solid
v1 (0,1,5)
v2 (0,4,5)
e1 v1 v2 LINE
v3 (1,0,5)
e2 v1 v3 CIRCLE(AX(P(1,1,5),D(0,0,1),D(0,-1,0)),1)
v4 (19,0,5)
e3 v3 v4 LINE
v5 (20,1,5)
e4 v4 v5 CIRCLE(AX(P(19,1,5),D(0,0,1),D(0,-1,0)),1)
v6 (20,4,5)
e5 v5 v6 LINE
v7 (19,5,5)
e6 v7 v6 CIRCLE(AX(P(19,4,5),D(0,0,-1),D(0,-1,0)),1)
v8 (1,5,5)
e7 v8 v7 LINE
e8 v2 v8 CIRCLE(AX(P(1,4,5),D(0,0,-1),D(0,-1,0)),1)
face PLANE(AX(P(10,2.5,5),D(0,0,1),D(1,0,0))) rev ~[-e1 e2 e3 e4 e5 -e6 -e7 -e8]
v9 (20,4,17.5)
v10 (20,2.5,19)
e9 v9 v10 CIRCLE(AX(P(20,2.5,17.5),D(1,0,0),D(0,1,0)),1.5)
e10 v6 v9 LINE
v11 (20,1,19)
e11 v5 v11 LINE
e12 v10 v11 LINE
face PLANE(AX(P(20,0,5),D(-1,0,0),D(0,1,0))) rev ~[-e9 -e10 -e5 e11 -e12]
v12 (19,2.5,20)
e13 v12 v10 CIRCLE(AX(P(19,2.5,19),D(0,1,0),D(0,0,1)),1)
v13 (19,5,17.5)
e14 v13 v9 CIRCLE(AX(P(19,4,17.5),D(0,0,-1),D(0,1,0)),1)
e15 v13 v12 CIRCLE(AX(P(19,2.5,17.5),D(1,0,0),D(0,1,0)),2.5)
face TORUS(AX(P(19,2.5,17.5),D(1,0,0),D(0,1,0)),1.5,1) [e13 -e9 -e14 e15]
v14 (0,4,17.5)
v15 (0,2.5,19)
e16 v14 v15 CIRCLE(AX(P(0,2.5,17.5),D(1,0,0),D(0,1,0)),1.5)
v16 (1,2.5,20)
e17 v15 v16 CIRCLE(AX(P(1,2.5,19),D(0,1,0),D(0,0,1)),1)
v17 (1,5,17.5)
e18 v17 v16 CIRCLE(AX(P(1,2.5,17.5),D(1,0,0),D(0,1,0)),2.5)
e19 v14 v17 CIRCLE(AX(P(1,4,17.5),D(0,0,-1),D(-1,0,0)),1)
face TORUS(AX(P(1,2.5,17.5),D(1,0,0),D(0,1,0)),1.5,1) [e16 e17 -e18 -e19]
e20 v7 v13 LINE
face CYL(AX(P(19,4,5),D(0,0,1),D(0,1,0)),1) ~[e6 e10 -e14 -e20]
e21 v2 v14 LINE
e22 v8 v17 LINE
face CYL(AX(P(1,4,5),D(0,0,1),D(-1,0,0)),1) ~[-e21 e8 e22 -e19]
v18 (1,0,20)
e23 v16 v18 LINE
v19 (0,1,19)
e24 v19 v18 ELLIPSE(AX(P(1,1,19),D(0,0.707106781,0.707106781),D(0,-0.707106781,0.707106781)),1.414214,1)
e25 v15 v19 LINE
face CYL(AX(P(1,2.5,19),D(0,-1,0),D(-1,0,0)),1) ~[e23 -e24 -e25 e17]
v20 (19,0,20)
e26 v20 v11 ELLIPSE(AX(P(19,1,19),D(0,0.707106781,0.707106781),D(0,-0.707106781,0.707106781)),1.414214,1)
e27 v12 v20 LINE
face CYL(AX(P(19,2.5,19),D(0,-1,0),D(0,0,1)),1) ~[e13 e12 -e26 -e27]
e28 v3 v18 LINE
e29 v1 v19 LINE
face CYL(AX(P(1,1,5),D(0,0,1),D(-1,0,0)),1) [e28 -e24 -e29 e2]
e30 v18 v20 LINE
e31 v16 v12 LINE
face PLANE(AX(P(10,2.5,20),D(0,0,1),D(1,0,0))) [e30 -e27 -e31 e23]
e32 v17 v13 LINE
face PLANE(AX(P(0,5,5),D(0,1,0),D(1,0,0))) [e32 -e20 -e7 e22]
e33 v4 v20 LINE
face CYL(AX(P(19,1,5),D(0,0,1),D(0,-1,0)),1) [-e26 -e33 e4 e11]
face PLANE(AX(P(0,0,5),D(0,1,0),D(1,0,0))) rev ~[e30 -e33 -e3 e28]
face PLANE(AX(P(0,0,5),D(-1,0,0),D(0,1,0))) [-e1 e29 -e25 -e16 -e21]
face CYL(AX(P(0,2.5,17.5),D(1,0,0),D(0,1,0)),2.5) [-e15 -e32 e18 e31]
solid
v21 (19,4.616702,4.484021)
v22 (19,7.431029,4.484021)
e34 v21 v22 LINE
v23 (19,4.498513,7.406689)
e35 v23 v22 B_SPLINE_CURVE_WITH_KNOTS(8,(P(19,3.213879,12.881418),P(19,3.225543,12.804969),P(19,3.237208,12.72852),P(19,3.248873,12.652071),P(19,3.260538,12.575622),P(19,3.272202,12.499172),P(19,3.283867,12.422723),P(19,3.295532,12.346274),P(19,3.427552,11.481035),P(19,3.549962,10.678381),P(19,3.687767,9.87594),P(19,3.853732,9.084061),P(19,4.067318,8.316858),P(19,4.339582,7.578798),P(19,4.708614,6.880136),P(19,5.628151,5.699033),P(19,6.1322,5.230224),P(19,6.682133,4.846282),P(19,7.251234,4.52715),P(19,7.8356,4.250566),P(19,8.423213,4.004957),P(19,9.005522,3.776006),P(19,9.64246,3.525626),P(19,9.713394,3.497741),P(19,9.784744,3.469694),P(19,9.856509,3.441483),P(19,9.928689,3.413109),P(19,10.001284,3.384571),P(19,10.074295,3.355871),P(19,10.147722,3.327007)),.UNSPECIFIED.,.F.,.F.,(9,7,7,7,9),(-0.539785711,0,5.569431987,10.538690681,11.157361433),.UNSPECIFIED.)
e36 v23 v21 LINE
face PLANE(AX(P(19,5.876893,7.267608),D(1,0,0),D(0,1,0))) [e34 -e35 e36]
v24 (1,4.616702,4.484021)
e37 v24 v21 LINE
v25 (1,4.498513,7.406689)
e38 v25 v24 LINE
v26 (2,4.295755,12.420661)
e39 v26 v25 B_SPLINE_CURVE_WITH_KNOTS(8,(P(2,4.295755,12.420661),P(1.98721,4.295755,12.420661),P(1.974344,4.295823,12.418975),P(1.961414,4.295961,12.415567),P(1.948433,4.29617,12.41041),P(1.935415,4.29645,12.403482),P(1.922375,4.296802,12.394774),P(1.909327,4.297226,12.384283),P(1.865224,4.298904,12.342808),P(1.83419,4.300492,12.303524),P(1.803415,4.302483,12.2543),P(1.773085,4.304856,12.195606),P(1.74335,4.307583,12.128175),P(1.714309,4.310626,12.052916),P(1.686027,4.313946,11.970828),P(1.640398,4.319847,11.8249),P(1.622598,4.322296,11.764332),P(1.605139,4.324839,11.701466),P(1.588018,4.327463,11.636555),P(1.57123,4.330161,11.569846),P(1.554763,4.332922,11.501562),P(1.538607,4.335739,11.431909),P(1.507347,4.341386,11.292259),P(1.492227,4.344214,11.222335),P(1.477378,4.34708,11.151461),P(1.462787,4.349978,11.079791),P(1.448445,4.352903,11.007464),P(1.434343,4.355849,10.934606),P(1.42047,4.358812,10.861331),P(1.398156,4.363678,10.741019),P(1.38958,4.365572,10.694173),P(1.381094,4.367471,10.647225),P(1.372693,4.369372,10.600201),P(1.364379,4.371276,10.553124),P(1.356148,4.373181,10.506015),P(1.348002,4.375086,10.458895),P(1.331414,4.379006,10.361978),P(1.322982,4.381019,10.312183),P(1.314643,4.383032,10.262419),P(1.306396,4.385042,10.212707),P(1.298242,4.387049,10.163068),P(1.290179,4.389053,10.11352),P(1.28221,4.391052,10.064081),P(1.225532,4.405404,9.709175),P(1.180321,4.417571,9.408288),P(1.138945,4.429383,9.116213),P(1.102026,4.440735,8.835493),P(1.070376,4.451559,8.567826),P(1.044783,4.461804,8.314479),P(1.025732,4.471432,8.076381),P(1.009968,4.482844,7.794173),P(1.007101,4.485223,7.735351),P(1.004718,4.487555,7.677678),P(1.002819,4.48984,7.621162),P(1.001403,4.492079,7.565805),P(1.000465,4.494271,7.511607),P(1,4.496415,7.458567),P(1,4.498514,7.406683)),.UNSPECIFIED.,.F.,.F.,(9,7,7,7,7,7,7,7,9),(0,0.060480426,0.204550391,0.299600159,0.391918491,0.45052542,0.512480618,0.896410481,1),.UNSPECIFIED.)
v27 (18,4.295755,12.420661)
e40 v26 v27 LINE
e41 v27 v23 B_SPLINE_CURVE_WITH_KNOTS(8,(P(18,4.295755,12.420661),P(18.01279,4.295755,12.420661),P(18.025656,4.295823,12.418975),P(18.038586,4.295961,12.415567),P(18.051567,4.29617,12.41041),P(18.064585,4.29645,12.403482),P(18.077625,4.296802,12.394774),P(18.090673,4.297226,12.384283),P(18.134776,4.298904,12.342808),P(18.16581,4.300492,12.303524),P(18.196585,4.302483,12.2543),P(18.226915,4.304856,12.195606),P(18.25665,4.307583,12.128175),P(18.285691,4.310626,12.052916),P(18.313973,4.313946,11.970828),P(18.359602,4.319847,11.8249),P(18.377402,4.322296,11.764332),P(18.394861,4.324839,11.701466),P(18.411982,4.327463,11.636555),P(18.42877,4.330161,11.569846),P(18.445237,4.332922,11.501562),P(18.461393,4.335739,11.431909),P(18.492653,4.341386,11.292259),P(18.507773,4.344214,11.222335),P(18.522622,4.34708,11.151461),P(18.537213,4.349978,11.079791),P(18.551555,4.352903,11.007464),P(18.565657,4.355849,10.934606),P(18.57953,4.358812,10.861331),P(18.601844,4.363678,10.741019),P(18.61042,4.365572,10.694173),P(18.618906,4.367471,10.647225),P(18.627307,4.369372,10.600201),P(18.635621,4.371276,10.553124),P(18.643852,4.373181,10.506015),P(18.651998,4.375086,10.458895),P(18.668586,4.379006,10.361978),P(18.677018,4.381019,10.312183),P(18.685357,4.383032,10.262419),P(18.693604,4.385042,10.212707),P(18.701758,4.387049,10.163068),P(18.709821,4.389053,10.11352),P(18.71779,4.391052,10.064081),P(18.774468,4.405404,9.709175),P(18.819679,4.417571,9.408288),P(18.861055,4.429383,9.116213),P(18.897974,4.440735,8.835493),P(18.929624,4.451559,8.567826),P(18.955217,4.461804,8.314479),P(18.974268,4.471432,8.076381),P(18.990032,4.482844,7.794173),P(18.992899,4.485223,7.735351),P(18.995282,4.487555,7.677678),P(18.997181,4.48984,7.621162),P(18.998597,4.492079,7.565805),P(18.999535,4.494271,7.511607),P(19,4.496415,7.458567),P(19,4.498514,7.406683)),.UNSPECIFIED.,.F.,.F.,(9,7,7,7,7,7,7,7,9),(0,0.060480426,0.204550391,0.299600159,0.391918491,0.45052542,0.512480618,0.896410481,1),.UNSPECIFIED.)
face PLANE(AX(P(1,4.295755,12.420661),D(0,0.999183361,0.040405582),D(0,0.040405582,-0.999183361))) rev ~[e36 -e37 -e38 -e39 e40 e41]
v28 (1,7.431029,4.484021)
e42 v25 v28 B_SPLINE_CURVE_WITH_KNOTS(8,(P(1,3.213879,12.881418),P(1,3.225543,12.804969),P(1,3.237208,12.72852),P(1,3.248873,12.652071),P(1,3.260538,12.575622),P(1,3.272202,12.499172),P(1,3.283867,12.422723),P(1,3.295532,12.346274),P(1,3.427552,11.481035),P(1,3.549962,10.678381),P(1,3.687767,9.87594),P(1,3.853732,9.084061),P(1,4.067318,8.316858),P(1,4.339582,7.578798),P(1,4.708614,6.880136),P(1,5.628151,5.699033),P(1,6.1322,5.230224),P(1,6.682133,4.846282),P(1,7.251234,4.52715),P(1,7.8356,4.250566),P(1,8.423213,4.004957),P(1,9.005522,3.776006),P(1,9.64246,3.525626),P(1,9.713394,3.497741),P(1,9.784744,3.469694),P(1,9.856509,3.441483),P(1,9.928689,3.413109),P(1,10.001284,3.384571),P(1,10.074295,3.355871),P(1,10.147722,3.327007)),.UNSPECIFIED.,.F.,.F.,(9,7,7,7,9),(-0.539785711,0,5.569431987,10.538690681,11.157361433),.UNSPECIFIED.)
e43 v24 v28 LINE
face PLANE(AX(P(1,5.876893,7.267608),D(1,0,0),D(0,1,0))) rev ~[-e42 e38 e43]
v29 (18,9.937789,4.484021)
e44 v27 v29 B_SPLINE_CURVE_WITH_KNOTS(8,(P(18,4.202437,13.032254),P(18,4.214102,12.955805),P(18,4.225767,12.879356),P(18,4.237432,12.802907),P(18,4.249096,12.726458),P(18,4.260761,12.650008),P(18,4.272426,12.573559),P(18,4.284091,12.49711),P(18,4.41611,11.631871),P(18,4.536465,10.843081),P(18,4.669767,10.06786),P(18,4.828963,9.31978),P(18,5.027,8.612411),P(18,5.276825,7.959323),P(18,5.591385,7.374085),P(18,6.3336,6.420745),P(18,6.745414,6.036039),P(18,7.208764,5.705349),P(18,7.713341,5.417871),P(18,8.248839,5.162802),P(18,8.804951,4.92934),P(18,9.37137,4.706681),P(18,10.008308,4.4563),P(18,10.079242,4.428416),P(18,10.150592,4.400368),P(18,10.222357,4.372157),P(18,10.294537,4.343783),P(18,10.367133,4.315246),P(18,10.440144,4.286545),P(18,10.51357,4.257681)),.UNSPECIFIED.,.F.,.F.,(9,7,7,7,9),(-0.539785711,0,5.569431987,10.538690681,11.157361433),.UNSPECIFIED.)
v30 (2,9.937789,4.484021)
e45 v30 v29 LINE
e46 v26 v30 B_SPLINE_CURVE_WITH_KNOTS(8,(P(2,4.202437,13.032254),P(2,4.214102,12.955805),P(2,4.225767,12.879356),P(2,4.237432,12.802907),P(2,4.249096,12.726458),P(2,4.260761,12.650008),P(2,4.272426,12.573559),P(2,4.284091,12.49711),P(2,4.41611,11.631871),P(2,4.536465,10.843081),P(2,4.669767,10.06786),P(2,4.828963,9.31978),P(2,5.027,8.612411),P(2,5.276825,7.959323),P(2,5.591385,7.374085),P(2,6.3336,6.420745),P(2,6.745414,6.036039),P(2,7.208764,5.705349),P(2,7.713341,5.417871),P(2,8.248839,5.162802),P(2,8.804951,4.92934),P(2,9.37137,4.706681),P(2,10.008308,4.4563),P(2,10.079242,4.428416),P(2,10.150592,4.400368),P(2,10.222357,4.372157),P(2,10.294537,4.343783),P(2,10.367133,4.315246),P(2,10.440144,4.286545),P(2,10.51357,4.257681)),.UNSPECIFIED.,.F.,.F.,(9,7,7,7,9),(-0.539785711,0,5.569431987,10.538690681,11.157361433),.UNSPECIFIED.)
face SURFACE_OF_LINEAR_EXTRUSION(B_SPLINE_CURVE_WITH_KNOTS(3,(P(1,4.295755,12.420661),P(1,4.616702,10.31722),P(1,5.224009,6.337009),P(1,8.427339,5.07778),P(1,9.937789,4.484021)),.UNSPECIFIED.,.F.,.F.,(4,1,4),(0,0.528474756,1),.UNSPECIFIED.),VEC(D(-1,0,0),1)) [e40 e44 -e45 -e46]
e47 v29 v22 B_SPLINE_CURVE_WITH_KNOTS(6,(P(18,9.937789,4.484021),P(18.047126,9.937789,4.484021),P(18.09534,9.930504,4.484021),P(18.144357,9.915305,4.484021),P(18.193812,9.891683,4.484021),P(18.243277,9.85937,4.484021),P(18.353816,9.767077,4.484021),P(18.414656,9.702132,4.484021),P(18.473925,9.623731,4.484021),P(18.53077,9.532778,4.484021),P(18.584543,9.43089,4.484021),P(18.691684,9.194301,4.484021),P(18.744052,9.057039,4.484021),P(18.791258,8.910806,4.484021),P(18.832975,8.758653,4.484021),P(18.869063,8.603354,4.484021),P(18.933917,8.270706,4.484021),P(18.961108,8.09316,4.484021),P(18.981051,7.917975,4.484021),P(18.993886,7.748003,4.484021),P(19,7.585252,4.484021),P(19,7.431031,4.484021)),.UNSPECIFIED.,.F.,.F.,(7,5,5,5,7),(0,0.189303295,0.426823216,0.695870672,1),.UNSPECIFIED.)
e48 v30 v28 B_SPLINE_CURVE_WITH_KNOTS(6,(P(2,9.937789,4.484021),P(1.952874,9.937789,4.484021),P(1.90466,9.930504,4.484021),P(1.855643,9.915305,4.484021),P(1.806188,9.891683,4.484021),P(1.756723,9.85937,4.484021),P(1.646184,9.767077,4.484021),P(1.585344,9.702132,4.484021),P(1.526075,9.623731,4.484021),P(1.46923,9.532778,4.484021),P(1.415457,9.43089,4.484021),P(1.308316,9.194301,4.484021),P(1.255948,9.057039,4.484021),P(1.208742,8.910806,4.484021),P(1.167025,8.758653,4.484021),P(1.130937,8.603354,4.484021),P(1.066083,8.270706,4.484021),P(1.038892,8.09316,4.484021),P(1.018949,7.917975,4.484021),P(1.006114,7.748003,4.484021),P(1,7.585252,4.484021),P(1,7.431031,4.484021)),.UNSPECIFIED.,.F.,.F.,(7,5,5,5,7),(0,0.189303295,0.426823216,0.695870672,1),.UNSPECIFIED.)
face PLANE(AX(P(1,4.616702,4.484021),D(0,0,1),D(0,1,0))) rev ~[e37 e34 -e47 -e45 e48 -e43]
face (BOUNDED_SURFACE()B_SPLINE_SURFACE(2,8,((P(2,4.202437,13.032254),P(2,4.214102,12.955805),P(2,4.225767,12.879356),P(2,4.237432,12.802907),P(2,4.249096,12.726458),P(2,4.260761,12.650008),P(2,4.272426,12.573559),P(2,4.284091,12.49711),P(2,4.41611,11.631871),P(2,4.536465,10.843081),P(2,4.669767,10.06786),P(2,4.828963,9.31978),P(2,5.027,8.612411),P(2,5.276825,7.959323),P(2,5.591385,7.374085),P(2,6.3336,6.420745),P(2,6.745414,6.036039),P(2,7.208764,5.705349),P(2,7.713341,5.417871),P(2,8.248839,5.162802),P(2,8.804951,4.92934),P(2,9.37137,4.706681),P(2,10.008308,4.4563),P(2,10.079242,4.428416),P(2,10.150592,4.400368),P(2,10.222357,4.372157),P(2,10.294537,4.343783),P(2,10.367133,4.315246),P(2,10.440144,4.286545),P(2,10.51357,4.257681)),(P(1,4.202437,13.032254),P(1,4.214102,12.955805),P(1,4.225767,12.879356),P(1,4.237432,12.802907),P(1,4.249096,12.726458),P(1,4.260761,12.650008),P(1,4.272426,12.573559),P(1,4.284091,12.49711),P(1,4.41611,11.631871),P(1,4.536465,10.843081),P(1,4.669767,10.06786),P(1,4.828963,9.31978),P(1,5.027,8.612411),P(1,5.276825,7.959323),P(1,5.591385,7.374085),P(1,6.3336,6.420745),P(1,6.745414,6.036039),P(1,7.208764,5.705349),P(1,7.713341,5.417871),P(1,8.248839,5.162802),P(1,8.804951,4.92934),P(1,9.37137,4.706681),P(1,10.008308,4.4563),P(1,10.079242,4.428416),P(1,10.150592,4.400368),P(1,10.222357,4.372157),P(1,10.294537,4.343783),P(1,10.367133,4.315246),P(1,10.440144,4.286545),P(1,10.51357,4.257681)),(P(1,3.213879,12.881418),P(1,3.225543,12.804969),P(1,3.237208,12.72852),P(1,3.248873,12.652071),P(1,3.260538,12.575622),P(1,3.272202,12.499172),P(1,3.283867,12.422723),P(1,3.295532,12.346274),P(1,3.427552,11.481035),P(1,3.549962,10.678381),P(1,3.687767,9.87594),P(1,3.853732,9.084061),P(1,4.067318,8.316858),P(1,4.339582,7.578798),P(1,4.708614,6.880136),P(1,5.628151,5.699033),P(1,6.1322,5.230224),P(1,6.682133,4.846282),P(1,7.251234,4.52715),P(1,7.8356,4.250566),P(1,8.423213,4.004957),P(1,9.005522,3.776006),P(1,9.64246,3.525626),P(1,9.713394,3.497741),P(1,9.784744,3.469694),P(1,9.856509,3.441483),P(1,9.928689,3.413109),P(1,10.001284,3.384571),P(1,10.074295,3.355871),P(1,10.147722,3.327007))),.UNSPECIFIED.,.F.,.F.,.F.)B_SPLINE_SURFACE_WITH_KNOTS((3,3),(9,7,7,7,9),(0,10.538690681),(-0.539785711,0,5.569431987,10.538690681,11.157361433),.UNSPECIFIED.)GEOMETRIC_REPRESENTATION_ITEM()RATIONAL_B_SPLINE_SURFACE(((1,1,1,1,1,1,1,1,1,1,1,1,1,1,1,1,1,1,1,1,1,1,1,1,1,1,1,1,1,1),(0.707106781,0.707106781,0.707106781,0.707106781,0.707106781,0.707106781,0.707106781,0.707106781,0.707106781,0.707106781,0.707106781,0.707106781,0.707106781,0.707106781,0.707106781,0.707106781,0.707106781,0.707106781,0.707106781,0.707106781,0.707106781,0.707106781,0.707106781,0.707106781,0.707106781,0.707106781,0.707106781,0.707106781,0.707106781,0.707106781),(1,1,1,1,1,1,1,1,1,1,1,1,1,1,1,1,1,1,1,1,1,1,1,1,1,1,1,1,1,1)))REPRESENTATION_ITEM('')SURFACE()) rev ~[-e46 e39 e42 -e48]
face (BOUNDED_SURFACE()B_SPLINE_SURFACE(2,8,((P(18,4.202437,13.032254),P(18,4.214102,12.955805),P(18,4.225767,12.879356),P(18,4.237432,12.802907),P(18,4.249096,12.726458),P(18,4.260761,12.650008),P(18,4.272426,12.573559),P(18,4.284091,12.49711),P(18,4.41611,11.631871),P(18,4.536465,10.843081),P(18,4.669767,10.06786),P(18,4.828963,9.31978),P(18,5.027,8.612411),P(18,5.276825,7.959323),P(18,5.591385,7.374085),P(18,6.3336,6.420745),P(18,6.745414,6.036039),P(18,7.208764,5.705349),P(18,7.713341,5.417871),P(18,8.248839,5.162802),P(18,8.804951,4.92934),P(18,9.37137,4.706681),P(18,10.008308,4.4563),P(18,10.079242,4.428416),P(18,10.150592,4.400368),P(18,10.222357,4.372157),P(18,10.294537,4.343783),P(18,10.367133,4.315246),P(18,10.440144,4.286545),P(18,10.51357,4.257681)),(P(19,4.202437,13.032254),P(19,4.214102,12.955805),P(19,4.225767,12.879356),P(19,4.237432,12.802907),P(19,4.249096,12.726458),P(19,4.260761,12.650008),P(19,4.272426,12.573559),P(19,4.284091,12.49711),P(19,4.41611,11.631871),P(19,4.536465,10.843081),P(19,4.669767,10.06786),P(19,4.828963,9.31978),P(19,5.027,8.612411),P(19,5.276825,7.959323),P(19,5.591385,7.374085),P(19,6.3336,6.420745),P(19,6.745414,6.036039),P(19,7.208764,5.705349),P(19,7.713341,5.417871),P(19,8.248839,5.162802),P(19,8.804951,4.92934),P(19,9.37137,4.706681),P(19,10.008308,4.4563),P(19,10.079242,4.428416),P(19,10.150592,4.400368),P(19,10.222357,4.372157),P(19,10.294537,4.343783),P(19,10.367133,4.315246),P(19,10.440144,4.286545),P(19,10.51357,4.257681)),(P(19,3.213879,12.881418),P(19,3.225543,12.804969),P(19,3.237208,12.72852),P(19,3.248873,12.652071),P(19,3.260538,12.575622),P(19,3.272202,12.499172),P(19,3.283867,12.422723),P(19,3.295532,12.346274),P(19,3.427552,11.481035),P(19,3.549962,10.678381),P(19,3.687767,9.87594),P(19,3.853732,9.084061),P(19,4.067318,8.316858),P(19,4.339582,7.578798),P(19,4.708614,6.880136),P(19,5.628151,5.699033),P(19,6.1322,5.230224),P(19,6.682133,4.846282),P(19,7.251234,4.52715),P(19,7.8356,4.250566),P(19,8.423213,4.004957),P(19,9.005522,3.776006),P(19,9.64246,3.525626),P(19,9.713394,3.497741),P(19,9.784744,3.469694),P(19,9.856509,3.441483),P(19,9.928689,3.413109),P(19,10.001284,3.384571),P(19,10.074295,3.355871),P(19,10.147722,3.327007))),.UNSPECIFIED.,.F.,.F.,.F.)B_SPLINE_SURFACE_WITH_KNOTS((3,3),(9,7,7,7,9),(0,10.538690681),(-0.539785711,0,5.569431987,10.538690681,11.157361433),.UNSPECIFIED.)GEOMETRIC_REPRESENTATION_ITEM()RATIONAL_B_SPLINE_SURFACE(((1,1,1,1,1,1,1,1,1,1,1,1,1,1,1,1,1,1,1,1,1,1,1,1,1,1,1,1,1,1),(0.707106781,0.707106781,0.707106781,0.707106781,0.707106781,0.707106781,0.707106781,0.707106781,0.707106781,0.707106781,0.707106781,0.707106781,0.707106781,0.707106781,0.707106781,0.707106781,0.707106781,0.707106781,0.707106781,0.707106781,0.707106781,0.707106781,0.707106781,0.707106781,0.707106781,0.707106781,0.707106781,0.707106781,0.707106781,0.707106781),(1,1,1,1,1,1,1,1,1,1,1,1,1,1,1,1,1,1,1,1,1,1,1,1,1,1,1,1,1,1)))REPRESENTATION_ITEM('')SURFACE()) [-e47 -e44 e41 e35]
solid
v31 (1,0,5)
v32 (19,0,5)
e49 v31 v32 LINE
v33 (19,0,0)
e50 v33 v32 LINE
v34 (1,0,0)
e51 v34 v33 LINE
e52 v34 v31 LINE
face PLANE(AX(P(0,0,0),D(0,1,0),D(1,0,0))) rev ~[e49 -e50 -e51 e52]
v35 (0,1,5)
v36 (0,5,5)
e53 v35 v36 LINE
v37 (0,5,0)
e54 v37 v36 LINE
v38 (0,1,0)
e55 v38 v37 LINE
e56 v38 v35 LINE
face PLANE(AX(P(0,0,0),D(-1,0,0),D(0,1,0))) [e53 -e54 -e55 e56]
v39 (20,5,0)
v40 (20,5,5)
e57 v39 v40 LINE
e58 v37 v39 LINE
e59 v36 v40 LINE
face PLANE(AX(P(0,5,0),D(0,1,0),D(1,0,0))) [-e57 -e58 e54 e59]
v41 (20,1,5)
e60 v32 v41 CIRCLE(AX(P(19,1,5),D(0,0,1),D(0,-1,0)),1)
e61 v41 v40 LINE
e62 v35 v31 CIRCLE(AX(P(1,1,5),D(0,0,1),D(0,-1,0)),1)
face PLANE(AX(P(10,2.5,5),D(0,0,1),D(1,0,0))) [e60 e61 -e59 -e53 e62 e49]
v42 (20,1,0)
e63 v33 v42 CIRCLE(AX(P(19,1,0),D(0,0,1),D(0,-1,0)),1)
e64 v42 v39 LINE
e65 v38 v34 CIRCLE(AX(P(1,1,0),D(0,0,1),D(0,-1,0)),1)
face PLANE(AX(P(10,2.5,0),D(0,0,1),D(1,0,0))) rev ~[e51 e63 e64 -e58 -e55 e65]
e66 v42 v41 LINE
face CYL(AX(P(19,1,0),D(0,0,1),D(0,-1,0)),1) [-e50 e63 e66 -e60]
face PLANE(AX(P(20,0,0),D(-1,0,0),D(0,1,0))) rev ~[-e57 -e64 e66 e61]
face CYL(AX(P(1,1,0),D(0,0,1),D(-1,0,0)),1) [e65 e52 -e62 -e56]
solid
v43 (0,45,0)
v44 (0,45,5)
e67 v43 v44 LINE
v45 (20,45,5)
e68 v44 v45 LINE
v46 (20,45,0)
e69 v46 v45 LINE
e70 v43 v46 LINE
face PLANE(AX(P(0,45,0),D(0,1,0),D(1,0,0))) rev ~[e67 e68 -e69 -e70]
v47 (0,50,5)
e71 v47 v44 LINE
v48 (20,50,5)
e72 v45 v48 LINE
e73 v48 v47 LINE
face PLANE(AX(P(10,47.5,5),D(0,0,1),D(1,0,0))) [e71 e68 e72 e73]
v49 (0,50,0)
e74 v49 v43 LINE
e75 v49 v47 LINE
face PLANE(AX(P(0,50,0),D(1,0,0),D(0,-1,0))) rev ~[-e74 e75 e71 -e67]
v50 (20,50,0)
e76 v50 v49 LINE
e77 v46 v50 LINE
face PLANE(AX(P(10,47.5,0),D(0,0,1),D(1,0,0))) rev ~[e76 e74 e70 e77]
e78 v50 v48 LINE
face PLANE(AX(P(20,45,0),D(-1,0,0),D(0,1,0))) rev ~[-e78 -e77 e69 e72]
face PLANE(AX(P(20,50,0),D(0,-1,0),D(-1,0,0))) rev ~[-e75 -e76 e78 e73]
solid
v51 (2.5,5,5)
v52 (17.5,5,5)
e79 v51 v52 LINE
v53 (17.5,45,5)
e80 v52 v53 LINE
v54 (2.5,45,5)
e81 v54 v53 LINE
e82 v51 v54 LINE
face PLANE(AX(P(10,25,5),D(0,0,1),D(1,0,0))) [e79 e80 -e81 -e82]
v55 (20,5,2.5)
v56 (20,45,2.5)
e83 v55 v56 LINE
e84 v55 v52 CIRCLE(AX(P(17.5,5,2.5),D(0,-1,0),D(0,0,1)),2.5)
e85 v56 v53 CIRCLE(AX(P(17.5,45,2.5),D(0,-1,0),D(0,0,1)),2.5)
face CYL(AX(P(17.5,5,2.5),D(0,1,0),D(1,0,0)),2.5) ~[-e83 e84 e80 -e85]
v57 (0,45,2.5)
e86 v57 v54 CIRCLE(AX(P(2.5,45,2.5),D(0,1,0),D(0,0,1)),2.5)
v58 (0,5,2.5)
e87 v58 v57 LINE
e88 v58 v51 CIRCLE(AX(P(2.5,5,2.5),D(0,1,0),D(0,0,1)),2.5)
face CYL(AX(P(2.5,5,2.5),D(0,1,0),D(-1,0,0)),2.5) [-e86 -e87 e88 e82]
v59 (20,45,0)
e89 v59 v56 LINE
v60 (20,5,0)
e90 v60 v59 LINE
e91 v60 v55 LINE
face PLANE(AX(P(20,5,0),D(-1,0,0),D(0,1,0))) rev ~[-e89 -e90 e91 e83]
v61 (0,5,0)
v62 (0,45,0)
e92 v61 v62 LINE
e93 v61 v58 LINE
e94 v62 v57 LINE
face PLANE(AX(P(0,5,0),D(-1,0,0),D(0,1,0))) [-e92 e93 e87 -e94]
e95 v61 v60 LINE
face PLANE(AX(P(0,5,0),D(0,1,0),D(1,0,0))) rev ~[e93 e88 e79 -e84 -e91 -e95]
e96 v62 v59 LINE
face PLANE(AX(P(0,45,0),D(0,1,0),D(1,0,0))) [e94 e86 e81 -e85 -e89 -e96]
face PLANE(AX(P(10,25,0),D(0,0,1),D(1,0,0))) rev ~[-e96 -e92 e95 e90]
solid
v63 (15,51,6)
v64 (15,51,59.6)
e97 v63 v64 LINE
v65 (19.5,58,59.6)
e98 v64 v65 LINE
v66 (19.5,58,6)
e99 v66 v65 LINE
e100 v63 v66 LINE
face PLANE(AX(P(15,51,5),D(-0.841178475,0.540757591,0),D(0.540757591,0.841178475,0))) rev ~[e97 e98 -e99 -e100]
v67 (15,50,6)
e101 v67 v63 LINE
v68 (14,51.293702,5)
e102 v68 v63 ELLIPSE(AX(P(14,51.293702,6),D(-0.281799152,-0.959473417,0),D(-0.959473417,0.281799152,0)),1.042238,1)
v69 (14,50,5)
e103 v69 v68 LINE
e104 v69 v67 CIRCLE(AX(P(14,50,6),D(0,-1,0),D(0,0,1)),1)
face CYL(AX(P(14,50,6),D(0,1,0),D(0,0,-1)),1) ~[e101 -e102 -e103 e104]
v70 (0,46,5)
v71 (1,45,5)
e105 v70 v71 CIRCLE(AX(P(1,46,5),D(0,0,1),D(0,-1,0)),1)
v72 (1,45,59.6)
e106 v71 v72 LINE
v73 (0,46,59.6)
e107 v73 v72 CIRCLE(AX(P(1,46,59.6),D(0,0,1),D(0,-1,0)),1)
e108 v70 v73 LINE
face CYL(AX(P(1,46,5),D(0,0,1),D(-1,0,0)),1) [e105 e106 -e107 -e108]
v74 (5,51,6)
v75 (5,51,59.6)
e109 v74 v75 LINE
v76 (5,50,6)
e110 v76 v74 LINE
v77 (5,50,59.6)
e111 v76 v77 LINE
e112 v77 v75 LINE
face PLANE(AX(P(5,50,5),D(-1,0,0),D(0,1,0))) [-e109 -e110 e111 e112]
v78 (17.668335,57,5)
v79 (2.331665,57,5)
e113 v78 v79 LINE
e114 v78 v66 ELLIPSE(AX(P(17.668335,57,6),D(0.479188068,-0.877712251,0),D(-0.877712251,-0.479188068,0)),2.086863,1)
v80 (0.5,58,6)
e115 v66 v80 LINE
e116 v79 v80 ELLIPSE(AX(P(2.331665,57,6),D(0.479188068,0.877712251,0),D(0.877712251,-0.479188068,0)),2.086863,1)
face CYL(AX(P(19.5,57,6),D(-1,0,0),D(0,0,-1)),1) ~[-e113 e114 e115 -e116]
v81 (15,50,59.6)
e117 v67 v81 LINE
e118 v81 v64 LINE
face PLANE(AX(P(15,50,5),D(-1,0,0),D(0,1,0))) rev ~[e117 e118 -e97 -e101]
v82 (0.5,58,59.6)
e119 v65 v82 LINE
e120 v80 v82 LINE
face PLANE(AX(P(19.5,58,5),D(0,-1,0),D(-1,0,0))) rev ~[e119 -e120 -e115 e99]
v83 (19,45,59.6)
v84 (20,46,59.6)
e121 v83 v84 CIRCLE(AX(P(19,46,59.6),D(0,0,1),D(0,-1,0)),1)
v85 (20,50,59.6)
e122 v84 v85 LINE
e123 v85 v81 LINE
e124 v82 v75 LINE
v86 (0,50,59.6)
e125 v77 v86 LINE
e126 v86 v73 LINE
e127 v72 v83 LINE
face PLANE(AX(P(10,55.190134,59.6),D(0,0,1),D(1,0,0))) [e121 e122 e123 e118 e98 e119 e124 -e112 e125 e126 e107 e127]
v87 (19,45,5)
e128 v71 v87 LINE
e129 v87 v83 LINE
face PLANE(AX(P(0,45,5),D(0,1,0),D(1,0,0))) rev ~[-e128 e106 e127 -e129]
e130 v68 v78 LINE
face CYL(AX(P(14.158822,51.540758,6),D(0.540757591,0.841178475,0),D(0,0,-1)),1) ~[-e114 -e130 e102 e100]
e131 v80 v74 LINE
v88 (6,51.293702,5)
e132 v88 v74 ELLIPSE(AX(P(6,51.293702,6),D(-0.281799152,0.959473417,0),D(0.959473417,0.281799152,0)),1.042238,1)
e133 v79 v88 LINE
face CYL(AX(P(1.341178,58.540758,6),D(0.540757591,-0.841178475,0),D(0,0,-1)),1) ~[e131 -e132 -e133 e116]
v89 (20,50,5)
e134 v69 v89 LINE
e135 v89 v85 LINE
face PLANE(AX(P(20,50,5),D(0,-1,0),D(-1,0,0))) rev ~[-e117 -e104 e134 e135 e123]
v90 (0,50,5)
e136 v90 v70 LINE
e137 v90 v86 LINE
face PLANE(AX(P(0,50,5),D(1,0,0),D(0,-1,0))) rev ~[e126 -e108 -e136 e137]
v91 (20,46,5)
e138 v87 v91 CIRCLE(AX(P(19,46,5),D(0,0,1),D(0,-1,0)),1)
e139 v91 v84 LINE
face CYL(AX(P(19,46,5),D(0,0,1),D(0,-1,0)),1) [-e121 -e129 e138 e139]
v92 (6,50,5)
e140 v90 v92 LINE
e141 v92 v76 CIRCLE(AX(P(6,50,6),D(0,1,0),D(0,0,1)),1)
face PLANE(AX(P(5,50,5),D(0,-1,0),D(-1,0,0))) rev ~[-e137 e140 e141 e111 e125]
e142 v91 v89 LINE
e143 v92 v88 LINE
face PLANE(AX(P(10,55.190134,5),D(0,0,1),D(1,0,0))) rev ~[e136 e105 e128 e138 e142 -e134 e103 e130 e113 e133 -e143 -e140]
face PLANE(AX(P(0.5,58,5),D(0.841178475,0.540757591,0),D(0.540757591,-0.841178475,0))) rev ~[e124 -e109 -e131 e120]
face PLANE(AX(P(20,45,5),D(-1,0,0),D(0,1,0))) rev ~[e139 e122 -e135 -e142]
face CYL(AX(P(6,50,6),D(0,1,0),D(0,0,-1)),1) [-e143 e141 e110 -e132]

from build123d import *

# Parameters (mm, degrees)
F1_START = 5
F0_W     = 10
F0_H     = 1
F1_DEPTH = 54.6
F2_START = 5
F2_DEPTH = 54.6
F3_START = 5
F0_W_2   = 20
F0_H_2   = 5
F3_DEPTH = 15
F0_H_3   = 40
F4_DEPTH = 5
F5_DEPTH = 5
F6_R     = 2.5
F6_2_R   = 2.5
F8_START = 1
F8_DEPTH = 18
F9_R     = 1
F9_2_R   = 1
F9_3_R   = 1
F9_4_R   = 1


# Not quite as in the source:
# - two fillets or chamfers of one size are made in one step
# - a feature names something its author has since deleted; it is built from what else it names


with BuildPart() as f1:
    # F0 (on Top) → F1 (new body)
    with BuildSketch(Plane.XY.offset(F1_START)):
        Polygon((0.5, 58), (5, 51), (15, 51), (19.5, 58), align=None)
        with Locations((10, 50.5)):
            Rectangle(F0_W, F0_H)
        Polygon((0, 50), (0, 45), (20, 45), (20, 50), (15, 50), (5, 50), align=None)
    extrude(amount=F1_DEPTH)

    # F0 (on Top) → F2 (join)
    with BuildSketch(Plane.XY.offset(F2_START)):
        Polygon((0, 50), (0, 45), (20, 45), (20, 50), (15, 50), (5, 50), align=None)
    extrude(amount=F2_DEPTH)

    # F9
    f9_edges = [f1.edges().sort_by_distance(p)[0] for p in [
        (0, 45, 32.3),
        (20, 45, 32.3),
        (2.75, 54.5, 5),
        (10, 58, 5),
        (5, 50.5, 5),
        (15, 50.5, 5),
        (17.25, 54.5, 5),
    ]]
    fillet(f9_edges, radius=F9_R)


with BuildPart() as f3:
    # F0 (on Top) → F3 (new body)
    with BuildSketch(Plane.XY.offset(F3_START)):
        with Locations((10, 2.5)):
            Rectangle(F0_W_2, F0_H_2)
    extrude(amount=F3_DEPTH)

    # F6
    f6_edges = [f3.edges().sort_by_distance(p)[0] for p in [
        (10, 5, 20),
    ]]
    fillet(f6_edges, radius=F6_R)

    # F9#2
    f9_2_edges = [f3.edges().sort_by_distance(p)[0] for p in [
        (20, 5, 11.25),
        (0, 5, 11.25),
        (0, 0, 12.5),
        (20, 0, 12.5),
        (0, 4.267767, 19.267767),
        (0, 1.25, 20),
        (20, 4.267767, 19.267767),
        (20, 1.25, 20),
    ]]
    fillet(f9_2_edges, radius=F9_2_R)


with BuildPart() as f4:
    # F0 (on Top) → F4 (new body)
    with BuildSketch(Plane.XY):
        with Locations((10, 25)):
            Rectangle(F0_W_2, F0_H_3)
    extrude(amount=F4_DEPTH)

    # F6#2
    f6_2_edges = [f4.edges().sort_by_distance(p)[0] for p in [
        (20, 25, 5),
        (0, 25, 5),
    ]]
    fillet(f6_2_edges, radius=F6_2_R)


with BuildPart() as f5:
    # F0 (on Top) → F5 (new body)
    with BuildSketch(Plane.XY):
        with Locations((10, 2.5)):
            Rectangle(F0_W_2, F0_H_2)
    extrude(amount=F5_DEPTH)

    # F9#3
    f9_3_edges = [f5.edges().sort_by_distance(p)[0] for p in [
        (20, 0, 2.5),
        (0, 0, 2.5),
    ]]
    fillet(f9_3_edges, radius=F9_3_R)


with BuildPart() as f5b:
    # F0 (on Top) → F5, piece 2 (new body)
    with BuildSketch(Plane.XY):
        Polygon((0, 50), (0, 45), (20, 45), (20, 50), (15, 50), (5, 50), align=None)
    extrude(amount=F5_DEPTH)


with BuildPart() as f8:
    # F7 (on Right) → F8 (new body)
    with BuildSketch(Plane.YZ.offset(F8_START)):
        with BuildLine():
            Line((4.6167019755, 4.4840211049), (9.9377890915, 4.4840211049))
            add(Edge.make_bspline(
                [(4.2957553071, 12.42066134), (4.6167019755, 10.3172202345), (5.2240094479, 6.3370091055), (8.4273385535, 5.0777796032), (9.9377890915, 4.4840211049)],
                knots=[0, 0, 0, 0, 0.5284747561, 1, 1, 1, 1], degree=3))
            Line((4.2957553071, 12.42066134), (4.6167019755, 4.4840211049))
        make_face()
    extrude(amount=F8_DEPTH)

    # F9#4
    f9_4_edges = [f8.edges().sort_by_distance(p)[0] for p in [
        (1, 5.651637, 7.360722),
        (19, 5.651637, 7.360722),
    ]]
    fillet(f9_4_edges, radius=F9_4_R)


solid = Compound([f1.part, f3.part, f4.part, f5.part, f5b.part, f8.part])
